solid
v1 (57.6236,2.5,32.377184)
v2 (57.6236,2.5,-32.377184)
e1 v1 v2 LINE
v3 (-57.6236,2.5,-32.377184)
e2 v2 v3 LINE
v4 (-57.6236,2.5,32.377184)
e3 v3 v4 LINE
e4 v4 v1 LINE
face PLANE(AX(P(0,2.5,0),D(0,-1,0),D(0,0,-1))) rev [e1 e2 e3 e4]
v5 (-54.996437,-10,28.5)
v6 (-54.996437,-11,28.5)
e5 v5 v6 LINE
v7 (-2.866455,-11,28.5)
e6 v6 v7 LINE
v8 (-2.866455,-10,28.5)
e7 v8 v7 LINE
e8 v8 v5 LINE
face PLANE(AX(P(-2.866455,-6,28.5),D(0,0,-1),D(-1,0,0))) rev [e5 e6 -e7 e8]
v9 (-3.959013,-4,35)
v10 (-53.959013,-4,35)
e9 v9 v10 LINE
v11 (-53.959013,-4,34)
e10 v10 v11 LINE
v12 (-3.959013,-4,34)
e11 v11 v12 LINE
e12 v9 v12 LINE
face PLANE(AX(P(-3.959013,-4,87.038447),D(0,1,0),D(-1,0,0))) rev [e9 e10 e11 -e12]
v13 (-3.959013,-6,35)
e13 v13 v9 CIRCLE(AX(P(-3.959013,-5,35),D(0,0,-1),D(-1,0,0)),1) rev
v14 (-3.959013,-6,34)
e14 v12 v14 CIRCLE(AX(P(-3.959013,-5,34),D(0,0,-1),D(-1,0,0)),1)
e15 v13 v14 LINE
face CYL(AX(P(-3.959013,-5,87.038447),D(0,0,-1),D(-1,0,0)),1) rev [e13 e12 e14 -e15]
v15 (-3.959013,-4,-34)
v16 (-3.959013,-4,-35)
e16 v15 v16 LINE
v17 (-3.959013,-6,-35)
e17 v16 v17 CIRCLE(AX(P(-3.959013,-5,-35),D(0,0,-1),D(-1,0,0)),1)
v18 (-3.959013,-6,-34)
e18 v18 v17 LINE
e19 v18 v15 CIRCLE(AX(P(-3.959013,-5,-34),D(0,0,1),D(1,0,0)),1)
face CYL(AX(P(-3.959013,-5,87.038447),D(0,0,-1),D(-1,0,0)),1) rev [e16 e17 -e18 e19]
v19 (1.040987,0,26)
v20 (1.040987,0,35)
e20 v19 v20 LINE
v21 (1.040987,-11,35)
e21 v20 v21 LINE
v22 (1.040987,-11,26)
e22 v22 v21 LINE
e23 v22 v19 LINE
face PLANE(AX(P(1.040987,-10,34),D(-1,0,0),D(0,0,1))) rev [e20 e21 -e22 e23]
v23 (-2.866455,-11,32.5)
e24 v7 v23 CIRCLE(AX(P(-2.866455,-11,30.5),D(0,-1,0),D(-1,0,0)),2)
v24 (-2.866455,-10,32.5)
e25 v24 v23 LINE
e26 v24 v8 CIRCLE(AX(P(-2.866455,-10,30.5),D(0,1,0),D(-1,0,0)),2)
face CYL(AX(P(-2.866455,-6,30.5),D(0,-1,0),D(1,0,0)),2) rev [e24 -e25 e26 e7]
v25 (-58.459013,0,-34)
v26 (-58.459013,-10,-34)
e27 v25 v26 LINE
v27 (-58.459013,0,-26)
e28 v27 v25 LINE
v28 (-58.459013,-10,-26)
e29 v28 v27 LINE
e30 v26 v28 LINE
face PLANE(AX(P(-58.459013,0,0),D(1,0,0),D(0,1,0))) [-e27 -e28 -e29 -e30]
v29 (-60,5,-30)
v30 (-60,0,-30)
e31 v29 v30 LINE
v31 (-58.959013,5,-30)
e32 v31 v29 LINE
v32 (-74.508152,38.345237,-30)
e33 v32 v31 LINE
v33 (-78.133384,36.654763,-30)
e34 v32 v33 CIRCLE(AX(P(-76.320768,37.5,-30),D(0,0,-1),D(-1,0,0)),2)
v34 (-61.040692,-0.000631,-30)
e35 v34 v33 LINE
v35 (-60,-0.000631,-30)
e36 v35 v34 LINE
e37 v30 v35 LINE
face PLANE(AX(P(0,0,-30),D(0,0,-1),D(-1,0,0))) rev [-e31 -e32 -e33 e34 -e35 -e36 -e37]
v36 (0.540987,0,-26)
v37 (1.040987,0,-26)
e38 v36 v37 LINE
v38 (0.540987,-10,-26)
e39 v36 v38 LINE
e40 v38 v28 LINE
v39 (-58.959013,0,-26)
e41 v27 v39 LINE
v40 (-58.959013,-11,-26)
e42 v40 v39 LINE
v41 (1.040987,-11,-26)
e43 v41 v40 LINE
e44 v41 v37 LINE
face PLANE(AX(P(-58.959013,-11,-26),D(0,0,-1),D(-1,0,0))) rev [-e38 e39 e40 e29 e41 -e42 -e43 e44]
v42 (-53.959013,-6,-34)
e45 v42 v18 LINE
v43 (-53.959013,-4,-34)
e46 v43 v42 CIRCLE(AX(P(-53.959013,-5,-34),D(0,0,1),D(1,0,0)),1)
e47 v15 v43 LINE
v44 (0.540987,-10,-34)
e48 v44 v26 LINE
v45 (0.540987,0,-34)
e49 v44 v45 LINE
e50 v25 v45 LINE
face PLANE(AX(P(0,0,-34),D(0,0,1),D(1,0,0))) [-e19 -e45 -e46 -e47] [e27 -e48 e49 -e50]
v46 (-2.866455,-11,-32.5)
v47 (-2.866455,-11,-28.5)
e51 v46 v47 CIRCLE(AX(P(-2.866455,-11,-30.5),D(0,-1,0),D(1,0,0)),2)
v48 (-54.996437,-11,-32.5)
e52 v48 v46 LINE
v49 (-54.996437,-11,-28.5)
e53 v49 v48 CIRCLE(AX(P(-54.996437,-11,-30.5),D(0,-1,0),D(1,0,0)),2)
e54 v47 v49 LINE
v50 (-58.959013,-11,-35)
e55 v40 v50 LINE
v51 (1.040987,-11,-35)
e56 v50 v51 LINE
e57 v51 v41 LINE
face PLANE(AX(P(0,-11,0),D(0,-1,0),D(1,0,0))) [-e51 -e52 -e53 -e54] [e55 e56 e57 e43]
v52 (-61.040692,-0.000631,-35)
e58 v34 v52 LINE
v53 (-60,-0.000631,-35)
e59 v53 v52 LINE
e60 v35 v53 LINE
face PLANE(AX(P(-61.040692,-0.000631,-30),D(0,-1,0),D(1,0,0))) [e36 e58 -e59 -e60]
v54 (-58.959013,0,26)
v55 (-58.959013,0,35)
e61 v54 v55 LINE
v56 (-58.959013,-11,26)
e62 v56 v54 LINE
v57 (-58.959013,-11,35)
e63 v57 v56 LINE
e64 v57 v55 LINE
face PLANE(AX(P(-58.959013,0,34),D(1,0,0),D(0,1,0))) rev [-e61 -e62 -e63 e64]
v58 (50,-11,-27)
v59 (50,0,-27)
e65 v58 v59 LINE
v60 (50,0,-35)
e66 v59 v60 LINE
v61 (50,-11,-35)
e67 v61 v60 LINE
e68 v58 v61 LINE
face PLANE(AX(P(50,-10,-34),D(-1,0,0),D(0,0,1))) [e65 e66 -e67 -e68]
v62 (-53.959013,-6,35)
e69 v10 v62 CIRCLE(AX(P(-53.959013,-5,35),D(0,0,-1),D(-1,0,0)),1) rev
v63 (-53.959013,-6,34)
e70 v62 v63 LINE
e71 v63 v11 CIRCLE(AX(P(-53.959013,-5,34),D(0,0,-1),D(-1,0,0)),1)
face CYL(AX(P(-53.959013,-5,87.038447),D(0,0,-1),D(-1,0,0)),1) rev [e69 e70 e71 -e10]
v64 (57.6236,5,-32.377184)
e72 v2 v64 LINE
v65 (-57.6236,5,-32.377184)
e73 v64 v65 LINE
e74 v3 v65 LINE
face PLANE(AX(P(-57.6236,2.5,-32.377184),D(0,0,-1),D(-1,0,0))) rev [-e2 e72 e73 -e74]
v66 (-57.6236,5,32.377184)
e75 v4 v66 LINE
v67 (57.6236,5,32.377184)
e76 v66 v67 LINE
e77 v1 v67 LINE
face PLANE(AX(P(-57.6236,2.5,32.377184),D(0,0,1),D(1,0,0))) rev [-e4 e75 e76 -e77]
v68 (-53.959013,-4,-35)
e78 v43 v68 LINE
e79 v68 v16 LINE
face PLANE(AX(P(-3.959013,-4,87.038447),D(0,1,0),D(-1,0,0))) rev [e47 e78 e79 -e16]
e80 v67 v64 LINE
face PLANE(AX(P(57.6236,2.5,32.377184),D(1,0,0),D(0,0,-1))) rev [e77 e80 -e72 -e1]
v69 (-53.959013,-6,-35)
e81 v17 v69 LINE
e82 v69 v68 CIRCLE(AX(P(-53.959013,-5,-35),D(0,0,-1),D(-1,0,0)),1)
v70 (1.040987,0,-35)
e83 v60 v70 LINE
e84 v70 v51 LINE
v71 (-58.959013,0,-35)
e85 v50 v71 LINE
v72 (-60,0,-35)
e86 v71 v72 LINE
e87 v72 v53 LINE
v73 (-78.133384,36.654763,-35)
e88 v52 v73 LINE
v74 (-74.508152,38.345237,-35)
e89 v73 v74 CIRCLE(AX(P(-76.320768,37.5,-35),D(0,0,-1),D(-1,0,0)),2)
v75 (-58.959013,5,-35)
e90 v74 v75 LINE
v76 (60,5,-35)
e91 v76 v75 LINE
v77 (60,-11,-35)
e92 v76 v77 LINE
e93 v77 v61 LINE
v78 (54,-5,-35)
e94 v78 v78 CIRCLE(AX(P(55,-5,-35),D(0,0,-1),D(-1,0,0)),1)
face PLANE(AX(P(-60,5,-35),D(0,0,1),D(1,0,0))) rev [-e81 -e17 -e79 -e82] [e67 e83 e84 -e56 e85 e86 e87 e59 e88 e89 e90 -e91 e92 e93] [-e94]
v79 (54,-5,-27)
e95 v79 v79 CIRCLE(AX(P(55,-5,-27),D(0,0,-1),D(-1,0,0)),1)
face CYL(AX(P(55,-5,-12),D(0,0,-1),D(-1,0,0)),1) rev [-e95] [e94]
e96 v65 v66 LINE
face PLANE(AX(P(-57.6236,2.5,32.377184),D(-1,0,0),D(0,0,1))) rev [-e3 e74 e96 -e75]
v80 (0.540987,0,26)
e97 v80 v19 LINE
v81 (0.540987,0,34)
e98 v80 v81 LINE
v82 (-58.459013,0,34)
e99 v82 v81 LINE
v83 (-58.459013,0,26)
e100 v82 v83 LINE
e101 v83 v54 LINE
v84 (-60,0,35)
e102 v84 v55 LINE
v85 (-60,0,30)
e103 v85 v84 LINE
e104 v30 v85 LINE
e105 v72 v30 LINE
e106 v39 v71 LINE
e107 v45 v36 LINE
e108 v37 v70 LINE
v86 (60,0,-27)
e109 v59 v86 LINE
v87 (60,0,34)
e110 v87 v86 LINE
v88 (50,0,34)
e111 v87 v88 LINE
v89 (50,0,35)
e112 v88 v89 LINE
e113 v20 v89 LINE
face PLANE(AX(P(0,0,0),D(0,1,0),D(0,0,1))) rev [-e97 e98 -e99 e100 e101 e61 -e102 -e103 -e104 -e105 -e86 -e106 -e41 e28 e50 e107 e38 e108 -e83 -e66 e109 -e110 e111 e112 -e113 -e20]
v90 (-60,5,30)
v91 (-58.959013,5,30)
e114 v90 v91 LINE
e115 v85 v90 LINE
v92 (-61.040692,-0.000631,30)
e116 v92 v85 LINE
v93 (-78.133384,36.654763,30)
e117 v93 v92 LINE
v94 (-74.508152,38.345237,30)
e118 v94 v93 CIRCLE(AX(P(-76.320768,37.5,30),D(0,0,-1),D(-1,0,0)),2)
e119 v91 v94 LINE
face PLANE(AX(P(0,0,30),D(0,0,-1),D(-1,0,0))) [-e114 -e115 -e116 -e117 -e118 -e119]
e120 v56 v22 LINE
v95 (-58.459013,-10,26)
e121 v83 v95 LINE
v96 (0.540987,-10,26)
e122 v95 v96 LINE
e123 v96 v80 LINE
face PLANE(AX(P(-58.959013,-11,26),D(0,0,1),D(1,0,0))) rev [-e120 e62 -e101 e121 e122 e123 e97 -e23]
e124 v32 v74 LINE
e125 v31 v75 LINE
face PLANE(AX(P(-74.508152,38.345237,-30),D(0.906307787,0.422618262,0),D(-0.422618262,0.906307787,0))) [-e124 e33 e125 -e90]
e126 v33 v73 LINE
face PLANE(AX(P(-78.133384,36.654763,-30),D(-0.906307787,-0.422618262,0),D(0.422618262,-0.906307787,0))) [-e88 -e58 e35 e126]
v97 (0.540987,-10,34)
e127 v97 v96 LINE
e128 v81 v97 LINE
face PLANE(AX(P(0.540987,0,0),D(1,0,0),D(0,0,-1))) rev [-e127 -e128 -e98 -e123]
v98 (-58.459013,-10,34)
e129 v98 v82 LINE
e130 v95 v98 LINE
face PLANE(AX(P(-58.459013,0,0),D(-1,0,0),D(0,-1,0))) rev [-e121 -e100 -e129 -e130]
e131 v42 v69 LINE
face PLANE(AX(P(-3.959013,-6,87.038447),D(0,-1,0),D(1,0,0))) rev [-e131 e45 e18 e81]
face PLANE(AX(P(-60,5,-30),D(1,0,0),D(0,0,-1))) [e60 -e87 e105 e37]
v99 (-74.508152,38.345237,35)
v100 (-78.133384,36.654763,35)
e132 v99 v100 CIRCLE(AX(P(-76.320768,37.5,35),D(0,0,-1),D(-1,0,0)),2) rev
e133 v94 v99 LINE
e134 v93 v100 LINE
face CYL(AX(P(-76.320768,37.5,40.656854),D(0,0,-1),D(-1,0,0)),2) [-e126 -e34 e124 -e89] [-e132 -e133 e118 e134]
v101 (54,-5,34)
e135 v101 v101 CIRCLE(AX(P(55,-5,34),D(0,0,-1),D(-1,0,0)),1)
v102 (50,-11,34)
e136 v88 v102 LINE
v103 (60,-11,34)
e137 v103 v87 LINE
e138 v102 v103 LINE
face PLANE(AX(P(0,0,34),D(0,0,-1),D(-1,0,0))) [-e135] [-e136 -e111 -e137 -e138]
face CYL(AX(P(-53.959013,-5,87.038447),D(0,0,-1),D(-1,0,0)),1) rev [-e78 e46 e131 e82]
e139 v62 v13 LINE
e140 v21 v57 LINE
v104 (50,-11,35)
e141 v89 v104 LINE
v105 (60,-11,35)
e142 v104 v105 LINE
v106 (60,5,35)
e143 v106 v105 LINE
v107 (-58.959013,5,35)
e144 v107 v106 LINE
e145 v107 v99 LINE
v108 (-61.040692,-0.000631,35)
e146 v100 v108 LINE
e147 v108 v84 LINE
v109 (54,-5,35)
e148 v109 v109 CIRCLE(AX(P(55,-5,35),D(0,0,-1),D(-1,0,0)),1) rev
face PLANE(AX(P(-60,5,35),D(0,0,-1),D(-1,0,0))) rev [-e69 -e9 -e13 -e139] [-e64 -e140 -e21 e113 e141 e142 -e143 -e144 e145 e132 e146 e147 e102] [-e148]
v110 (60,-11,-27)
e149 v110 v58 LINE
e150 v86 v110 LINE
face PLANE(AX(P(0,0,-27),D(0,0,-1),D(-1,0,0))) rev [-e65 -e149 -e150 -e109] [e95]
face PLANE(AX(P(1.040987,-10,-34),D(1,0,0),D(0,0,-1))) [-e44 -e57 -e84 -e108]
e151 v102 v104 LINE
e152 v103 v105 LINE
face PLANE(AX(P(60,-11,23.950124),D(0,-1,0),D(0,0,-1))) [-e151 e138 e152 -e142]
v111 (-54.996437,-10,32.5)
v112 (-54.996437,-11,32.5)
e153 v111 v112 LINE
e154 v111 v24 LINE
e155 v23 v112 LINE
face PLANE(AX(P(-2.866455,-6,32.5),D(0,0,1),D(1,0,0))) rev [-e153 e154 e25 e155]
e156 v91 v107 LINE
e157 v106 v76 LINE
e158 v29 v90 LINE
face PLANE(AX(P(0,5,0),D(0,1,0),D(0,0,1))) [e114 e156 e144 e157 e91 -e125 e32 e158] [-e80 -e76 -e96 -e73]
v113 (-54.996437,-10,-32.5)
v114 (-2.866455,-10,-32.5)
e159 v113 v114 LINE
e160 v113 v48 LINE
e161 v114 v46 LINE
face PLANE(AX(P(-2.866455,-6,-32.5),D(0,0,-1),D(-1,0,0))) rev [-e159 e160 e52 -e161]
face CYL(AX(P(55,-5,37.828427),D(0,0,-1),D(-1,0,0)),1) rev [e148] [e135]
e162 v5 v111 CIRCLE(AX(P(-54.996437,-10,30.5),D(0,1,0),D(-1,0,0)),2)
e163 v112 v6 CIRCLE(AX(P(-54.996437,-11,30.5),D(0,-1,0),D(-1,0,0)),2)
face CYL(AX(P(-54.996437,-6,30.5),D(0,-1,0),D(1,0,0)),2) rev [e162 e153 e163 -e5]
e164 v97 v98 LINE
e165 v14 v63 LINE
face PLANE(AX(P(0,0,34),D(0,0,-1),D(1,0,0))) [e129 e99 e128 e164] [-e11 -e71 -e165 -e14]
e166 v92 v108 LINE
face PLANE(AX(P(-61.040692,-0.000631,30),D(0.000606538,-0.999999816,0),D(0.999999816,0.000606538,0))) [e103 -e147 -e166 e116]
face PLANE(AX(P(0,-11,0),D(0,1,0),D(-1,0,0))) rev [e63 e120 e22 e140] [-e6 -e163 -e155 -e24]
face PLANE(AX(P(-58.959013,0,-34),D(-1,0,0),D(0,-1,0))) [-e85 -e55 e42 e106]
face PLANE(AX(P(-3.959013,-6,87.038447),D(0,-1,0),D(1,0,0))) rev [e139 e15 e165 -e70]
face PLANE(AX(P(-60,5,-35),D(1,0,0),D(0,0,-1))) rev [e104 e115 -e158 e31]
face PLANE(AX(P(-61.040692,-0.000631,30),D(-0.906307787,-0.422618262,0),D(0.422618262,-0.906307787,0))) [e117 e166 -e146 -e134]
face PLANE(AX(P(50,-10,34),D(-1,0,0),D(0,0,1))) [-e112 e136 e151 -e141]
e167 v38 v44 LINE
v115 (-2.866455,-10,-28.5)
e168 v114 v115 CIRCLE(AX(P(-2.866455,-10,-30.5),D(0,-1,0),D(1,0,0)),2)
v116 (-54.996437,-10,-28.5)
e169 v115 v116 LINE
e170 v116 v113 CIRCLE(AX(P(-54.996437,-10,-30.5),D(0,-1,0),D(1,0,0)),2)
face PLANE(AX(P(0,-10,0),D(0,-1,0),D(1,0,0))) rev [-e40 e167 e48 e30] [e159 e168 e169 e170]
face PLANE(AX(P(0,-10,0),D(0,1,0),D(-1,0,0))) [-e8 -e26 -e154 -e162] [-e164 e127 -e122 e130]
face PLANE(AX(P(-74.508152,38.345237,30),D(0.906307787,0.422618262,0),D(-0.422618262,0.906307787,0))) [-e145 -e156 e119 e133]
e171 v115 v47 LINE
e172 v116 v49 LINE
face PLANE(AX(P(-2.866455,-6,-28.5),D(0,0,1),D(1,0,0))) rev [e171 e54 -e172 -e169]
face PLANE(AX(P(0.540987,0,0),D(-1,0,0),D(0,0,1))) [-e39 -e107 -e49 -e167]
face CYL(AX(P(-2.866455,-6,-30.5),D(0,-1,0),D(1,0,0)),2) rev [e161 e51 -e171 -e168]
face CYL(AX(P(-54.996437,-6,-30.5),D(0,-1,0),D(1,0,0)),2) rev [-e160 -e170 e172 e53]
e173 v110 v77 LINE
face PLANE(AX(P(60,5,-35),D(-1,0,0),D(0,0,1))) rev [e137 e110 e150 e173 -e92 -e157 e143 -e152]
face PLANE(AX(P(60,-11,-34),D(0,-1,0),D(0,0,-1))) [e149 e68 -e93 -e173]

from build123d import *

# Parameters (mm, degrees)
SKETCH1_W            = 120
SKETCH1_H            = 70
BOSS_EXTRUDE1_DEPTH  = 5
BOSS_EXTRUDE4_DEPTH  = 5
BOSS_EXTRUDE5_DEPTH  = 5
BOSS_EXTRUDE7_START  = -70
SKETCH7_R            = 2
BOSS_EXTRUDE7_DEPTH  = 70
SKETCH8_W            = 115.247199032
SKETCH8_H            = 64.754368984
CUT_EXTRUDE1_DEPTH   = 2.5
SKETCH13_W           = 10
SKETCH13_H           = 10
BOSS_EXTRUDE8_DEPTH  = 1
SKETCH14_W           = 10
SKETCH14_H           = 10
BOSS_EXTRUDE9_DEPTH  = 1
SKETCH15_W           = 60
SKETCH15_H           = 10
BOSS_EXTRUDE12_DEPTH = 1
CUT_EXTRUDE2_REACH   = 114.225
CUT_EXTRUDE3_START   = -70
SKETCH17_R           = 1
CUT_EXTRUDE3_DEPTH   = 70
SKETCH18_W           = 60
SKETCH18_H           = 9
BOSS_EXTRUDE15_DEPTH = 1
THICKEN1_START       = 0.540986693
THICKEN1_OUTLINE_W   = 10
THICKEN1_OUTLINE_H   = 8
THICKEN1_DEPTH       = 0.5
THICKEN2_START       = -58.959013307
THICKEN2_OUTLINE_W   = 10
THICKEN2_OUTLINE_H   = 8
THICKEN2_DEPTH       = 0.5
THICKEN3_START       = -58.959013307
THICKEN3_OUTLINE_W   = 10
THICKEN3_OUTLINE_H   = 8
THICKEN3_DEPTH       = 0.5
THICKEN4_START       = 0.540986693
THICKEN4_OUTLINE_W   = 10
THICKEN4_OUTLINE_H   = 8
THICKEN4_DEPTH       = 0.5
SKETCH22_W           = 10
SKETCH22_H           = 1
BOSS_EXTRUDE16_DEPTH = 1
SKETCH23_W           = 10
SKETCH23_H           = 1
BOSS_EXTRUDE17_DEPTH = 1
CUT_EXTRUDE4_DEPTH   = 5
SKETCH28_W           = 10
SKETCH28_H           = 11
BOSS_EXTRUDE18_DEPTH = 8
CUT_EXTRUDE5_START   = -23
SKETCH29_R           = 1
CUT_EXTRUDE5_DEPTH   = 23


# Read off the part's stored shape, not the designer's step: Thicken1, Thicken2, Thicken3, Thicken4
with BuildPart() as part:
    # Sketch1 → Boss-Extrude1 (new body)
    with BuildSketch(Plane(origin=(0, 0, 0), x_dir=(1, 0, 0), z_dir=(0, 1, 0))):
        Rectangle(SKETCH1_W, SKETCH1_H)
    extrude(amount=BOSS_EXTRUDE1_DEPTH)

    # Sketch2 → Boss-Extrude4 (add)
    with BuildSketch(Plane(origin=(0, 0, -35), x_dir=(-1, 0, 0), z_dir=(0, 0, -1))):
        Polygon((74.508152461, 38.345236523), (58.959013307, 5), (60, 5), (60, -0.000631219), (61.04069235, -0.000631219), (78.133383609, 36.654763477), align=None)
    extrude(amount=-BOSS_EXTRUDE4_DEPTH)

    # Sketch6 → Boss-Extrude5 (add)
    with BuildSketch(Plane.XY.offset(35)):
        Polygon((-61.04069235, -0.000631219), (-60, 0), (-60, 5), (-58.959013307, 5), (-74.508152461, 38.345236523), (-78.133383609, 36.654763477), align=None)
    extrude(amount=-BOSS_EXTRUDE5_DEPTH)

    # Sketch7 → Boss-Extrude7 (add)
    with BuildSketch(Plane(origin=(0, 0, -35), x_dir=(-1, 0, 0), z_dir=(0, 0, -1)).offset(BOSS_EXTRUDE7_START)):
        with Locations(Location((76.320768035, 37.5, 0), (0, 0, 335))):
            Circle(SKETCH7_R)
    extrude(amount=BOSS_EXTRUDE7_DEPTH)

    # Sketch8 → Cut-Extrude1 (cut)
    with BuildSketch(Plane(origin=(0, 5, 0), x_dir=(1, 0, 0), z_dir=(0, 1, 0))):
        Rectangle(SKETCH8_W, SKETCH8_H)
    extrude(amount=-CUT_EXTRUDE1_DEPTH, mode=Mode.SUBTRACT)

    # Sketch13 → Boss-Extrude8 (add)
    with BuildSketch(Plane(origin=(0, 0, -35), x_dir=(-1, 0, 0), z_dir=(0, 0, -1))):
        with Locations((-55, -5)):
            Rectangle(SKETCH13_W, SKETCH13_H)
    extrude(amount=-BOSS_EXTRUDE8_DEPTH)

    # Sketch14 → Boss-Extrude9 (add)
    with BuildSketch(Plane.XY.offset(35)):
        with Locations((55, -5)):
            Rectangle(SKETCH14_W, SKETCH14_H)
    extrude(amount=-BOSS_EXTRUDE9_DEPTH)

    # Sketch15 → Boss-Extrude12 (add)
    with BuildSketch(Plane(origin=(0, 0, -35), x_dir=(-1, 0, 0), z_dir=(0, 0, -1))):
        with Locations((28.959013307, -5)):
            Rectangle(SKETCH15_W, SKETCH15_H)
    boss_extrude12 = extrude(amount=-BOSS_EXTRUDE12_DEPTH)

    # Mirror1: Boss-Extrude12 across plane
    add(boss_extrude12.mirror(Plane.XY))

    # Cut-Extrude2: up to this face of the body (flat: up to its plane)
    cut_extrude2_end = Plane(part.part.faces().sort_by_distance((-15.670325555, 0.904669602, 35))[0])
    # Sketch16 → Cut-Extrude2 (cut, up to the picked face)
    with BuildSketch(Plane(origin=(0, 0, -35), x_dir=(-1, 0, 0), z_dir=(0, 0, -1)), mode=Mode.PRIVATE) as cut_extrude2_sk1:
        with BuildLine():
            Line((3.959013307, -4), (53.959013307, -4))
            ThreePointArc((53.959013307, -4), (54.959013307, -5), (53.959013307, -6))
            Line((53.959013307, -6), (3.959013307, -6))
            ThreePointArc((3.959013307, -6), (2.959013307, -5), (3.959013307, -4))
        make_face()
    cut_extrude2_tool1 = split(extrude(cut_extrude2_sk1.sketch, amount=-CUT_EXTRUDE2_REACH, mode=Mode.PRIVATE), bisect_by=cut_extrude2_end, keep=Keep.BOTH, mode=Mode.PRIVATE)
    add(cut_extrude2_tool1.solids().sort_by(Axis((-28.959013, -5, -35), (0, 0, 1)))[0], mode=Mode.SUBTRACT)

    # Sketch17 → Cut-Extrude3 (cut)
    with BuildSketch(Plane(origin=(0, 0, -35), x_dir=(-1, 0, 0), z_dir=(0, 0, -1)).offset(CUT_EXTRUDE3_START)):
        with Locations((-55, -5)):
            Circle(SKETCH17_R)
    extrude(amount=CUT_EXTRUDE3_DEPTH, mode=Mode.SUBTRACT)

    # Sketch18 → Boss-Extrude15 (add)
    with BuildSketch(Plane.XZ.offset(10)):
        with Locations((-28.959013307, 30.5)):
            Rectangle(SKETCH18_W, SKETCH18_H)
        with Locations((-28.959013307, -30.5)):
            Rectangle(SKETCH18_W, SKETCH18_H)
    extrude(amount=BOSS_EXTRUDE15_DEPTH)

    # Thicken1 outline → Thicken1 (add)
    with BuildSketch(Plane.YZ.offset(THICKEN1_START)):
        with Locations((-5, 30)):
            Rectangle(THICKEN1_OUTLINE_W, THICKEN1_OUTLINE_H)
    extrude(amount=THICKEN1_DEPTH)

    # Thicken2 outline → Thicken2 (add)
    with BuildSketch(Plane.YZ.offset(THICKEN2_START)):
        with Locations((-5, -30)):
            Rectangle(THICKEN2_OUTLINE_W, THICKEN2_OUTLINE_H)
    extrude(amount=THICKEN2_DEPTH)

    # Thicken3 outline → Thicken3 (add)
    with BuildSketch(Plane.YZ.offset(THICKEN3_START)):
        with Locations((-5, 30)):
            Rectangle(THICKEN3_OUTLINE_W, THICKEN3_OUTLINE_H)
    extrude(amount=THICKEN3_DEPTH)

    # Thicken4 outline → Thicken4 (add)
    with BuildSketch(Plane.YZ.offset(THICKEN4_START)):
        with Locations((-5, -30)):
            Rectangle(THICKEN4_OUTLINE_W, THICKEN4_OUTLINE_H)
    extrude(amount=THICKEN4_DEPTH)

    # Sketch22 → Boss-Extrude16 (add)
    with BuildSketch(Plane.XY.offset(35)):
        with Locations((55, -10.5)):
            Rectangle(SKETCH22_W, SKETCH22_H)
    extrude(amount=-BOSS_EXTRUDE16_DEPTH)

    # Sketch23 → Boss-Extrude17 (add)
    with BuildSketch(Plane(origin=(0, 0, -35), x_dir=(-1, 0, 0), z_dir=(0, 0, -1))):
        with Locations((-55, -10.5)):
            Rectangle(SKETCH23_W, SKETCH23_H)
    extrude(amount=-BOSS_EXTRUDE17_DEPTH)

    # Sketch25 → Cut-Extrude4 (cut)
    with BuildSketch(Plane.XZ.offset(11)):
        with BuildLine():
            Line((-2.866454916, 32.5), (-54.996437016, 32.5))
            ThreePointArc((-54.996437016, 32.5), (-56.996437016, 30.5), (-54.996437016, 28.5))
            Line((-54.996437016, 28.5), (-2.866454916, 28.5))
            ThreePointArc((-2.866454916, 28.5), (-0.866454916, 30.5), (-2.866454916, 32.5))
        make_face()
        with BuildLine():
            Line((-2.866454916, -28.5), (-54.996437016, -28.5))
            ThreePointArc((-54.996437016, -28.5), (-56.996437016, -30.5), (-54.996437016, -32.5))
            Line((-54.996437016, -32.5), (-2.866454916, -32.5))
            ThreePointArc((-2.866454916, -32.5), (-0.866454916, -30.5), (-2.866454916, -28.5))
        make_face()
    extrude(amount=-CUT_EXTRUDE4_DEPTH, mode=Mode.SUBTRACT)

    # Sketch28 → Boss-Extrude18 (add)
    with BuildSketch(Plane(origin=(0, 0, -35), x_dir=(-1, 0, 0), z_dir=(0, 0, -1))):
        with Locations((-55, -5.5)):
            Rectangle(SKETCH28_W, SKETCH28_H)
    extrude(amount=-BOSS_EXTRUDE18_DEPTH)

    # Sketch29 → Cut-Extrude5 (cut)
    with BuildSketch(Plane(origin=(0, 0, -35), x_dir=(-1, 0, 0), z_dir=(0, 0, -1)).offset(CUT_EXTRUDE5_START)):
        with Locations((-55, -5)):
            Circle(SKETCH29_R)
    extrude(amount=CUT_EXTRUDE5_DEPTH, mode=Mode.SUBTRACT)


solid = part.part
